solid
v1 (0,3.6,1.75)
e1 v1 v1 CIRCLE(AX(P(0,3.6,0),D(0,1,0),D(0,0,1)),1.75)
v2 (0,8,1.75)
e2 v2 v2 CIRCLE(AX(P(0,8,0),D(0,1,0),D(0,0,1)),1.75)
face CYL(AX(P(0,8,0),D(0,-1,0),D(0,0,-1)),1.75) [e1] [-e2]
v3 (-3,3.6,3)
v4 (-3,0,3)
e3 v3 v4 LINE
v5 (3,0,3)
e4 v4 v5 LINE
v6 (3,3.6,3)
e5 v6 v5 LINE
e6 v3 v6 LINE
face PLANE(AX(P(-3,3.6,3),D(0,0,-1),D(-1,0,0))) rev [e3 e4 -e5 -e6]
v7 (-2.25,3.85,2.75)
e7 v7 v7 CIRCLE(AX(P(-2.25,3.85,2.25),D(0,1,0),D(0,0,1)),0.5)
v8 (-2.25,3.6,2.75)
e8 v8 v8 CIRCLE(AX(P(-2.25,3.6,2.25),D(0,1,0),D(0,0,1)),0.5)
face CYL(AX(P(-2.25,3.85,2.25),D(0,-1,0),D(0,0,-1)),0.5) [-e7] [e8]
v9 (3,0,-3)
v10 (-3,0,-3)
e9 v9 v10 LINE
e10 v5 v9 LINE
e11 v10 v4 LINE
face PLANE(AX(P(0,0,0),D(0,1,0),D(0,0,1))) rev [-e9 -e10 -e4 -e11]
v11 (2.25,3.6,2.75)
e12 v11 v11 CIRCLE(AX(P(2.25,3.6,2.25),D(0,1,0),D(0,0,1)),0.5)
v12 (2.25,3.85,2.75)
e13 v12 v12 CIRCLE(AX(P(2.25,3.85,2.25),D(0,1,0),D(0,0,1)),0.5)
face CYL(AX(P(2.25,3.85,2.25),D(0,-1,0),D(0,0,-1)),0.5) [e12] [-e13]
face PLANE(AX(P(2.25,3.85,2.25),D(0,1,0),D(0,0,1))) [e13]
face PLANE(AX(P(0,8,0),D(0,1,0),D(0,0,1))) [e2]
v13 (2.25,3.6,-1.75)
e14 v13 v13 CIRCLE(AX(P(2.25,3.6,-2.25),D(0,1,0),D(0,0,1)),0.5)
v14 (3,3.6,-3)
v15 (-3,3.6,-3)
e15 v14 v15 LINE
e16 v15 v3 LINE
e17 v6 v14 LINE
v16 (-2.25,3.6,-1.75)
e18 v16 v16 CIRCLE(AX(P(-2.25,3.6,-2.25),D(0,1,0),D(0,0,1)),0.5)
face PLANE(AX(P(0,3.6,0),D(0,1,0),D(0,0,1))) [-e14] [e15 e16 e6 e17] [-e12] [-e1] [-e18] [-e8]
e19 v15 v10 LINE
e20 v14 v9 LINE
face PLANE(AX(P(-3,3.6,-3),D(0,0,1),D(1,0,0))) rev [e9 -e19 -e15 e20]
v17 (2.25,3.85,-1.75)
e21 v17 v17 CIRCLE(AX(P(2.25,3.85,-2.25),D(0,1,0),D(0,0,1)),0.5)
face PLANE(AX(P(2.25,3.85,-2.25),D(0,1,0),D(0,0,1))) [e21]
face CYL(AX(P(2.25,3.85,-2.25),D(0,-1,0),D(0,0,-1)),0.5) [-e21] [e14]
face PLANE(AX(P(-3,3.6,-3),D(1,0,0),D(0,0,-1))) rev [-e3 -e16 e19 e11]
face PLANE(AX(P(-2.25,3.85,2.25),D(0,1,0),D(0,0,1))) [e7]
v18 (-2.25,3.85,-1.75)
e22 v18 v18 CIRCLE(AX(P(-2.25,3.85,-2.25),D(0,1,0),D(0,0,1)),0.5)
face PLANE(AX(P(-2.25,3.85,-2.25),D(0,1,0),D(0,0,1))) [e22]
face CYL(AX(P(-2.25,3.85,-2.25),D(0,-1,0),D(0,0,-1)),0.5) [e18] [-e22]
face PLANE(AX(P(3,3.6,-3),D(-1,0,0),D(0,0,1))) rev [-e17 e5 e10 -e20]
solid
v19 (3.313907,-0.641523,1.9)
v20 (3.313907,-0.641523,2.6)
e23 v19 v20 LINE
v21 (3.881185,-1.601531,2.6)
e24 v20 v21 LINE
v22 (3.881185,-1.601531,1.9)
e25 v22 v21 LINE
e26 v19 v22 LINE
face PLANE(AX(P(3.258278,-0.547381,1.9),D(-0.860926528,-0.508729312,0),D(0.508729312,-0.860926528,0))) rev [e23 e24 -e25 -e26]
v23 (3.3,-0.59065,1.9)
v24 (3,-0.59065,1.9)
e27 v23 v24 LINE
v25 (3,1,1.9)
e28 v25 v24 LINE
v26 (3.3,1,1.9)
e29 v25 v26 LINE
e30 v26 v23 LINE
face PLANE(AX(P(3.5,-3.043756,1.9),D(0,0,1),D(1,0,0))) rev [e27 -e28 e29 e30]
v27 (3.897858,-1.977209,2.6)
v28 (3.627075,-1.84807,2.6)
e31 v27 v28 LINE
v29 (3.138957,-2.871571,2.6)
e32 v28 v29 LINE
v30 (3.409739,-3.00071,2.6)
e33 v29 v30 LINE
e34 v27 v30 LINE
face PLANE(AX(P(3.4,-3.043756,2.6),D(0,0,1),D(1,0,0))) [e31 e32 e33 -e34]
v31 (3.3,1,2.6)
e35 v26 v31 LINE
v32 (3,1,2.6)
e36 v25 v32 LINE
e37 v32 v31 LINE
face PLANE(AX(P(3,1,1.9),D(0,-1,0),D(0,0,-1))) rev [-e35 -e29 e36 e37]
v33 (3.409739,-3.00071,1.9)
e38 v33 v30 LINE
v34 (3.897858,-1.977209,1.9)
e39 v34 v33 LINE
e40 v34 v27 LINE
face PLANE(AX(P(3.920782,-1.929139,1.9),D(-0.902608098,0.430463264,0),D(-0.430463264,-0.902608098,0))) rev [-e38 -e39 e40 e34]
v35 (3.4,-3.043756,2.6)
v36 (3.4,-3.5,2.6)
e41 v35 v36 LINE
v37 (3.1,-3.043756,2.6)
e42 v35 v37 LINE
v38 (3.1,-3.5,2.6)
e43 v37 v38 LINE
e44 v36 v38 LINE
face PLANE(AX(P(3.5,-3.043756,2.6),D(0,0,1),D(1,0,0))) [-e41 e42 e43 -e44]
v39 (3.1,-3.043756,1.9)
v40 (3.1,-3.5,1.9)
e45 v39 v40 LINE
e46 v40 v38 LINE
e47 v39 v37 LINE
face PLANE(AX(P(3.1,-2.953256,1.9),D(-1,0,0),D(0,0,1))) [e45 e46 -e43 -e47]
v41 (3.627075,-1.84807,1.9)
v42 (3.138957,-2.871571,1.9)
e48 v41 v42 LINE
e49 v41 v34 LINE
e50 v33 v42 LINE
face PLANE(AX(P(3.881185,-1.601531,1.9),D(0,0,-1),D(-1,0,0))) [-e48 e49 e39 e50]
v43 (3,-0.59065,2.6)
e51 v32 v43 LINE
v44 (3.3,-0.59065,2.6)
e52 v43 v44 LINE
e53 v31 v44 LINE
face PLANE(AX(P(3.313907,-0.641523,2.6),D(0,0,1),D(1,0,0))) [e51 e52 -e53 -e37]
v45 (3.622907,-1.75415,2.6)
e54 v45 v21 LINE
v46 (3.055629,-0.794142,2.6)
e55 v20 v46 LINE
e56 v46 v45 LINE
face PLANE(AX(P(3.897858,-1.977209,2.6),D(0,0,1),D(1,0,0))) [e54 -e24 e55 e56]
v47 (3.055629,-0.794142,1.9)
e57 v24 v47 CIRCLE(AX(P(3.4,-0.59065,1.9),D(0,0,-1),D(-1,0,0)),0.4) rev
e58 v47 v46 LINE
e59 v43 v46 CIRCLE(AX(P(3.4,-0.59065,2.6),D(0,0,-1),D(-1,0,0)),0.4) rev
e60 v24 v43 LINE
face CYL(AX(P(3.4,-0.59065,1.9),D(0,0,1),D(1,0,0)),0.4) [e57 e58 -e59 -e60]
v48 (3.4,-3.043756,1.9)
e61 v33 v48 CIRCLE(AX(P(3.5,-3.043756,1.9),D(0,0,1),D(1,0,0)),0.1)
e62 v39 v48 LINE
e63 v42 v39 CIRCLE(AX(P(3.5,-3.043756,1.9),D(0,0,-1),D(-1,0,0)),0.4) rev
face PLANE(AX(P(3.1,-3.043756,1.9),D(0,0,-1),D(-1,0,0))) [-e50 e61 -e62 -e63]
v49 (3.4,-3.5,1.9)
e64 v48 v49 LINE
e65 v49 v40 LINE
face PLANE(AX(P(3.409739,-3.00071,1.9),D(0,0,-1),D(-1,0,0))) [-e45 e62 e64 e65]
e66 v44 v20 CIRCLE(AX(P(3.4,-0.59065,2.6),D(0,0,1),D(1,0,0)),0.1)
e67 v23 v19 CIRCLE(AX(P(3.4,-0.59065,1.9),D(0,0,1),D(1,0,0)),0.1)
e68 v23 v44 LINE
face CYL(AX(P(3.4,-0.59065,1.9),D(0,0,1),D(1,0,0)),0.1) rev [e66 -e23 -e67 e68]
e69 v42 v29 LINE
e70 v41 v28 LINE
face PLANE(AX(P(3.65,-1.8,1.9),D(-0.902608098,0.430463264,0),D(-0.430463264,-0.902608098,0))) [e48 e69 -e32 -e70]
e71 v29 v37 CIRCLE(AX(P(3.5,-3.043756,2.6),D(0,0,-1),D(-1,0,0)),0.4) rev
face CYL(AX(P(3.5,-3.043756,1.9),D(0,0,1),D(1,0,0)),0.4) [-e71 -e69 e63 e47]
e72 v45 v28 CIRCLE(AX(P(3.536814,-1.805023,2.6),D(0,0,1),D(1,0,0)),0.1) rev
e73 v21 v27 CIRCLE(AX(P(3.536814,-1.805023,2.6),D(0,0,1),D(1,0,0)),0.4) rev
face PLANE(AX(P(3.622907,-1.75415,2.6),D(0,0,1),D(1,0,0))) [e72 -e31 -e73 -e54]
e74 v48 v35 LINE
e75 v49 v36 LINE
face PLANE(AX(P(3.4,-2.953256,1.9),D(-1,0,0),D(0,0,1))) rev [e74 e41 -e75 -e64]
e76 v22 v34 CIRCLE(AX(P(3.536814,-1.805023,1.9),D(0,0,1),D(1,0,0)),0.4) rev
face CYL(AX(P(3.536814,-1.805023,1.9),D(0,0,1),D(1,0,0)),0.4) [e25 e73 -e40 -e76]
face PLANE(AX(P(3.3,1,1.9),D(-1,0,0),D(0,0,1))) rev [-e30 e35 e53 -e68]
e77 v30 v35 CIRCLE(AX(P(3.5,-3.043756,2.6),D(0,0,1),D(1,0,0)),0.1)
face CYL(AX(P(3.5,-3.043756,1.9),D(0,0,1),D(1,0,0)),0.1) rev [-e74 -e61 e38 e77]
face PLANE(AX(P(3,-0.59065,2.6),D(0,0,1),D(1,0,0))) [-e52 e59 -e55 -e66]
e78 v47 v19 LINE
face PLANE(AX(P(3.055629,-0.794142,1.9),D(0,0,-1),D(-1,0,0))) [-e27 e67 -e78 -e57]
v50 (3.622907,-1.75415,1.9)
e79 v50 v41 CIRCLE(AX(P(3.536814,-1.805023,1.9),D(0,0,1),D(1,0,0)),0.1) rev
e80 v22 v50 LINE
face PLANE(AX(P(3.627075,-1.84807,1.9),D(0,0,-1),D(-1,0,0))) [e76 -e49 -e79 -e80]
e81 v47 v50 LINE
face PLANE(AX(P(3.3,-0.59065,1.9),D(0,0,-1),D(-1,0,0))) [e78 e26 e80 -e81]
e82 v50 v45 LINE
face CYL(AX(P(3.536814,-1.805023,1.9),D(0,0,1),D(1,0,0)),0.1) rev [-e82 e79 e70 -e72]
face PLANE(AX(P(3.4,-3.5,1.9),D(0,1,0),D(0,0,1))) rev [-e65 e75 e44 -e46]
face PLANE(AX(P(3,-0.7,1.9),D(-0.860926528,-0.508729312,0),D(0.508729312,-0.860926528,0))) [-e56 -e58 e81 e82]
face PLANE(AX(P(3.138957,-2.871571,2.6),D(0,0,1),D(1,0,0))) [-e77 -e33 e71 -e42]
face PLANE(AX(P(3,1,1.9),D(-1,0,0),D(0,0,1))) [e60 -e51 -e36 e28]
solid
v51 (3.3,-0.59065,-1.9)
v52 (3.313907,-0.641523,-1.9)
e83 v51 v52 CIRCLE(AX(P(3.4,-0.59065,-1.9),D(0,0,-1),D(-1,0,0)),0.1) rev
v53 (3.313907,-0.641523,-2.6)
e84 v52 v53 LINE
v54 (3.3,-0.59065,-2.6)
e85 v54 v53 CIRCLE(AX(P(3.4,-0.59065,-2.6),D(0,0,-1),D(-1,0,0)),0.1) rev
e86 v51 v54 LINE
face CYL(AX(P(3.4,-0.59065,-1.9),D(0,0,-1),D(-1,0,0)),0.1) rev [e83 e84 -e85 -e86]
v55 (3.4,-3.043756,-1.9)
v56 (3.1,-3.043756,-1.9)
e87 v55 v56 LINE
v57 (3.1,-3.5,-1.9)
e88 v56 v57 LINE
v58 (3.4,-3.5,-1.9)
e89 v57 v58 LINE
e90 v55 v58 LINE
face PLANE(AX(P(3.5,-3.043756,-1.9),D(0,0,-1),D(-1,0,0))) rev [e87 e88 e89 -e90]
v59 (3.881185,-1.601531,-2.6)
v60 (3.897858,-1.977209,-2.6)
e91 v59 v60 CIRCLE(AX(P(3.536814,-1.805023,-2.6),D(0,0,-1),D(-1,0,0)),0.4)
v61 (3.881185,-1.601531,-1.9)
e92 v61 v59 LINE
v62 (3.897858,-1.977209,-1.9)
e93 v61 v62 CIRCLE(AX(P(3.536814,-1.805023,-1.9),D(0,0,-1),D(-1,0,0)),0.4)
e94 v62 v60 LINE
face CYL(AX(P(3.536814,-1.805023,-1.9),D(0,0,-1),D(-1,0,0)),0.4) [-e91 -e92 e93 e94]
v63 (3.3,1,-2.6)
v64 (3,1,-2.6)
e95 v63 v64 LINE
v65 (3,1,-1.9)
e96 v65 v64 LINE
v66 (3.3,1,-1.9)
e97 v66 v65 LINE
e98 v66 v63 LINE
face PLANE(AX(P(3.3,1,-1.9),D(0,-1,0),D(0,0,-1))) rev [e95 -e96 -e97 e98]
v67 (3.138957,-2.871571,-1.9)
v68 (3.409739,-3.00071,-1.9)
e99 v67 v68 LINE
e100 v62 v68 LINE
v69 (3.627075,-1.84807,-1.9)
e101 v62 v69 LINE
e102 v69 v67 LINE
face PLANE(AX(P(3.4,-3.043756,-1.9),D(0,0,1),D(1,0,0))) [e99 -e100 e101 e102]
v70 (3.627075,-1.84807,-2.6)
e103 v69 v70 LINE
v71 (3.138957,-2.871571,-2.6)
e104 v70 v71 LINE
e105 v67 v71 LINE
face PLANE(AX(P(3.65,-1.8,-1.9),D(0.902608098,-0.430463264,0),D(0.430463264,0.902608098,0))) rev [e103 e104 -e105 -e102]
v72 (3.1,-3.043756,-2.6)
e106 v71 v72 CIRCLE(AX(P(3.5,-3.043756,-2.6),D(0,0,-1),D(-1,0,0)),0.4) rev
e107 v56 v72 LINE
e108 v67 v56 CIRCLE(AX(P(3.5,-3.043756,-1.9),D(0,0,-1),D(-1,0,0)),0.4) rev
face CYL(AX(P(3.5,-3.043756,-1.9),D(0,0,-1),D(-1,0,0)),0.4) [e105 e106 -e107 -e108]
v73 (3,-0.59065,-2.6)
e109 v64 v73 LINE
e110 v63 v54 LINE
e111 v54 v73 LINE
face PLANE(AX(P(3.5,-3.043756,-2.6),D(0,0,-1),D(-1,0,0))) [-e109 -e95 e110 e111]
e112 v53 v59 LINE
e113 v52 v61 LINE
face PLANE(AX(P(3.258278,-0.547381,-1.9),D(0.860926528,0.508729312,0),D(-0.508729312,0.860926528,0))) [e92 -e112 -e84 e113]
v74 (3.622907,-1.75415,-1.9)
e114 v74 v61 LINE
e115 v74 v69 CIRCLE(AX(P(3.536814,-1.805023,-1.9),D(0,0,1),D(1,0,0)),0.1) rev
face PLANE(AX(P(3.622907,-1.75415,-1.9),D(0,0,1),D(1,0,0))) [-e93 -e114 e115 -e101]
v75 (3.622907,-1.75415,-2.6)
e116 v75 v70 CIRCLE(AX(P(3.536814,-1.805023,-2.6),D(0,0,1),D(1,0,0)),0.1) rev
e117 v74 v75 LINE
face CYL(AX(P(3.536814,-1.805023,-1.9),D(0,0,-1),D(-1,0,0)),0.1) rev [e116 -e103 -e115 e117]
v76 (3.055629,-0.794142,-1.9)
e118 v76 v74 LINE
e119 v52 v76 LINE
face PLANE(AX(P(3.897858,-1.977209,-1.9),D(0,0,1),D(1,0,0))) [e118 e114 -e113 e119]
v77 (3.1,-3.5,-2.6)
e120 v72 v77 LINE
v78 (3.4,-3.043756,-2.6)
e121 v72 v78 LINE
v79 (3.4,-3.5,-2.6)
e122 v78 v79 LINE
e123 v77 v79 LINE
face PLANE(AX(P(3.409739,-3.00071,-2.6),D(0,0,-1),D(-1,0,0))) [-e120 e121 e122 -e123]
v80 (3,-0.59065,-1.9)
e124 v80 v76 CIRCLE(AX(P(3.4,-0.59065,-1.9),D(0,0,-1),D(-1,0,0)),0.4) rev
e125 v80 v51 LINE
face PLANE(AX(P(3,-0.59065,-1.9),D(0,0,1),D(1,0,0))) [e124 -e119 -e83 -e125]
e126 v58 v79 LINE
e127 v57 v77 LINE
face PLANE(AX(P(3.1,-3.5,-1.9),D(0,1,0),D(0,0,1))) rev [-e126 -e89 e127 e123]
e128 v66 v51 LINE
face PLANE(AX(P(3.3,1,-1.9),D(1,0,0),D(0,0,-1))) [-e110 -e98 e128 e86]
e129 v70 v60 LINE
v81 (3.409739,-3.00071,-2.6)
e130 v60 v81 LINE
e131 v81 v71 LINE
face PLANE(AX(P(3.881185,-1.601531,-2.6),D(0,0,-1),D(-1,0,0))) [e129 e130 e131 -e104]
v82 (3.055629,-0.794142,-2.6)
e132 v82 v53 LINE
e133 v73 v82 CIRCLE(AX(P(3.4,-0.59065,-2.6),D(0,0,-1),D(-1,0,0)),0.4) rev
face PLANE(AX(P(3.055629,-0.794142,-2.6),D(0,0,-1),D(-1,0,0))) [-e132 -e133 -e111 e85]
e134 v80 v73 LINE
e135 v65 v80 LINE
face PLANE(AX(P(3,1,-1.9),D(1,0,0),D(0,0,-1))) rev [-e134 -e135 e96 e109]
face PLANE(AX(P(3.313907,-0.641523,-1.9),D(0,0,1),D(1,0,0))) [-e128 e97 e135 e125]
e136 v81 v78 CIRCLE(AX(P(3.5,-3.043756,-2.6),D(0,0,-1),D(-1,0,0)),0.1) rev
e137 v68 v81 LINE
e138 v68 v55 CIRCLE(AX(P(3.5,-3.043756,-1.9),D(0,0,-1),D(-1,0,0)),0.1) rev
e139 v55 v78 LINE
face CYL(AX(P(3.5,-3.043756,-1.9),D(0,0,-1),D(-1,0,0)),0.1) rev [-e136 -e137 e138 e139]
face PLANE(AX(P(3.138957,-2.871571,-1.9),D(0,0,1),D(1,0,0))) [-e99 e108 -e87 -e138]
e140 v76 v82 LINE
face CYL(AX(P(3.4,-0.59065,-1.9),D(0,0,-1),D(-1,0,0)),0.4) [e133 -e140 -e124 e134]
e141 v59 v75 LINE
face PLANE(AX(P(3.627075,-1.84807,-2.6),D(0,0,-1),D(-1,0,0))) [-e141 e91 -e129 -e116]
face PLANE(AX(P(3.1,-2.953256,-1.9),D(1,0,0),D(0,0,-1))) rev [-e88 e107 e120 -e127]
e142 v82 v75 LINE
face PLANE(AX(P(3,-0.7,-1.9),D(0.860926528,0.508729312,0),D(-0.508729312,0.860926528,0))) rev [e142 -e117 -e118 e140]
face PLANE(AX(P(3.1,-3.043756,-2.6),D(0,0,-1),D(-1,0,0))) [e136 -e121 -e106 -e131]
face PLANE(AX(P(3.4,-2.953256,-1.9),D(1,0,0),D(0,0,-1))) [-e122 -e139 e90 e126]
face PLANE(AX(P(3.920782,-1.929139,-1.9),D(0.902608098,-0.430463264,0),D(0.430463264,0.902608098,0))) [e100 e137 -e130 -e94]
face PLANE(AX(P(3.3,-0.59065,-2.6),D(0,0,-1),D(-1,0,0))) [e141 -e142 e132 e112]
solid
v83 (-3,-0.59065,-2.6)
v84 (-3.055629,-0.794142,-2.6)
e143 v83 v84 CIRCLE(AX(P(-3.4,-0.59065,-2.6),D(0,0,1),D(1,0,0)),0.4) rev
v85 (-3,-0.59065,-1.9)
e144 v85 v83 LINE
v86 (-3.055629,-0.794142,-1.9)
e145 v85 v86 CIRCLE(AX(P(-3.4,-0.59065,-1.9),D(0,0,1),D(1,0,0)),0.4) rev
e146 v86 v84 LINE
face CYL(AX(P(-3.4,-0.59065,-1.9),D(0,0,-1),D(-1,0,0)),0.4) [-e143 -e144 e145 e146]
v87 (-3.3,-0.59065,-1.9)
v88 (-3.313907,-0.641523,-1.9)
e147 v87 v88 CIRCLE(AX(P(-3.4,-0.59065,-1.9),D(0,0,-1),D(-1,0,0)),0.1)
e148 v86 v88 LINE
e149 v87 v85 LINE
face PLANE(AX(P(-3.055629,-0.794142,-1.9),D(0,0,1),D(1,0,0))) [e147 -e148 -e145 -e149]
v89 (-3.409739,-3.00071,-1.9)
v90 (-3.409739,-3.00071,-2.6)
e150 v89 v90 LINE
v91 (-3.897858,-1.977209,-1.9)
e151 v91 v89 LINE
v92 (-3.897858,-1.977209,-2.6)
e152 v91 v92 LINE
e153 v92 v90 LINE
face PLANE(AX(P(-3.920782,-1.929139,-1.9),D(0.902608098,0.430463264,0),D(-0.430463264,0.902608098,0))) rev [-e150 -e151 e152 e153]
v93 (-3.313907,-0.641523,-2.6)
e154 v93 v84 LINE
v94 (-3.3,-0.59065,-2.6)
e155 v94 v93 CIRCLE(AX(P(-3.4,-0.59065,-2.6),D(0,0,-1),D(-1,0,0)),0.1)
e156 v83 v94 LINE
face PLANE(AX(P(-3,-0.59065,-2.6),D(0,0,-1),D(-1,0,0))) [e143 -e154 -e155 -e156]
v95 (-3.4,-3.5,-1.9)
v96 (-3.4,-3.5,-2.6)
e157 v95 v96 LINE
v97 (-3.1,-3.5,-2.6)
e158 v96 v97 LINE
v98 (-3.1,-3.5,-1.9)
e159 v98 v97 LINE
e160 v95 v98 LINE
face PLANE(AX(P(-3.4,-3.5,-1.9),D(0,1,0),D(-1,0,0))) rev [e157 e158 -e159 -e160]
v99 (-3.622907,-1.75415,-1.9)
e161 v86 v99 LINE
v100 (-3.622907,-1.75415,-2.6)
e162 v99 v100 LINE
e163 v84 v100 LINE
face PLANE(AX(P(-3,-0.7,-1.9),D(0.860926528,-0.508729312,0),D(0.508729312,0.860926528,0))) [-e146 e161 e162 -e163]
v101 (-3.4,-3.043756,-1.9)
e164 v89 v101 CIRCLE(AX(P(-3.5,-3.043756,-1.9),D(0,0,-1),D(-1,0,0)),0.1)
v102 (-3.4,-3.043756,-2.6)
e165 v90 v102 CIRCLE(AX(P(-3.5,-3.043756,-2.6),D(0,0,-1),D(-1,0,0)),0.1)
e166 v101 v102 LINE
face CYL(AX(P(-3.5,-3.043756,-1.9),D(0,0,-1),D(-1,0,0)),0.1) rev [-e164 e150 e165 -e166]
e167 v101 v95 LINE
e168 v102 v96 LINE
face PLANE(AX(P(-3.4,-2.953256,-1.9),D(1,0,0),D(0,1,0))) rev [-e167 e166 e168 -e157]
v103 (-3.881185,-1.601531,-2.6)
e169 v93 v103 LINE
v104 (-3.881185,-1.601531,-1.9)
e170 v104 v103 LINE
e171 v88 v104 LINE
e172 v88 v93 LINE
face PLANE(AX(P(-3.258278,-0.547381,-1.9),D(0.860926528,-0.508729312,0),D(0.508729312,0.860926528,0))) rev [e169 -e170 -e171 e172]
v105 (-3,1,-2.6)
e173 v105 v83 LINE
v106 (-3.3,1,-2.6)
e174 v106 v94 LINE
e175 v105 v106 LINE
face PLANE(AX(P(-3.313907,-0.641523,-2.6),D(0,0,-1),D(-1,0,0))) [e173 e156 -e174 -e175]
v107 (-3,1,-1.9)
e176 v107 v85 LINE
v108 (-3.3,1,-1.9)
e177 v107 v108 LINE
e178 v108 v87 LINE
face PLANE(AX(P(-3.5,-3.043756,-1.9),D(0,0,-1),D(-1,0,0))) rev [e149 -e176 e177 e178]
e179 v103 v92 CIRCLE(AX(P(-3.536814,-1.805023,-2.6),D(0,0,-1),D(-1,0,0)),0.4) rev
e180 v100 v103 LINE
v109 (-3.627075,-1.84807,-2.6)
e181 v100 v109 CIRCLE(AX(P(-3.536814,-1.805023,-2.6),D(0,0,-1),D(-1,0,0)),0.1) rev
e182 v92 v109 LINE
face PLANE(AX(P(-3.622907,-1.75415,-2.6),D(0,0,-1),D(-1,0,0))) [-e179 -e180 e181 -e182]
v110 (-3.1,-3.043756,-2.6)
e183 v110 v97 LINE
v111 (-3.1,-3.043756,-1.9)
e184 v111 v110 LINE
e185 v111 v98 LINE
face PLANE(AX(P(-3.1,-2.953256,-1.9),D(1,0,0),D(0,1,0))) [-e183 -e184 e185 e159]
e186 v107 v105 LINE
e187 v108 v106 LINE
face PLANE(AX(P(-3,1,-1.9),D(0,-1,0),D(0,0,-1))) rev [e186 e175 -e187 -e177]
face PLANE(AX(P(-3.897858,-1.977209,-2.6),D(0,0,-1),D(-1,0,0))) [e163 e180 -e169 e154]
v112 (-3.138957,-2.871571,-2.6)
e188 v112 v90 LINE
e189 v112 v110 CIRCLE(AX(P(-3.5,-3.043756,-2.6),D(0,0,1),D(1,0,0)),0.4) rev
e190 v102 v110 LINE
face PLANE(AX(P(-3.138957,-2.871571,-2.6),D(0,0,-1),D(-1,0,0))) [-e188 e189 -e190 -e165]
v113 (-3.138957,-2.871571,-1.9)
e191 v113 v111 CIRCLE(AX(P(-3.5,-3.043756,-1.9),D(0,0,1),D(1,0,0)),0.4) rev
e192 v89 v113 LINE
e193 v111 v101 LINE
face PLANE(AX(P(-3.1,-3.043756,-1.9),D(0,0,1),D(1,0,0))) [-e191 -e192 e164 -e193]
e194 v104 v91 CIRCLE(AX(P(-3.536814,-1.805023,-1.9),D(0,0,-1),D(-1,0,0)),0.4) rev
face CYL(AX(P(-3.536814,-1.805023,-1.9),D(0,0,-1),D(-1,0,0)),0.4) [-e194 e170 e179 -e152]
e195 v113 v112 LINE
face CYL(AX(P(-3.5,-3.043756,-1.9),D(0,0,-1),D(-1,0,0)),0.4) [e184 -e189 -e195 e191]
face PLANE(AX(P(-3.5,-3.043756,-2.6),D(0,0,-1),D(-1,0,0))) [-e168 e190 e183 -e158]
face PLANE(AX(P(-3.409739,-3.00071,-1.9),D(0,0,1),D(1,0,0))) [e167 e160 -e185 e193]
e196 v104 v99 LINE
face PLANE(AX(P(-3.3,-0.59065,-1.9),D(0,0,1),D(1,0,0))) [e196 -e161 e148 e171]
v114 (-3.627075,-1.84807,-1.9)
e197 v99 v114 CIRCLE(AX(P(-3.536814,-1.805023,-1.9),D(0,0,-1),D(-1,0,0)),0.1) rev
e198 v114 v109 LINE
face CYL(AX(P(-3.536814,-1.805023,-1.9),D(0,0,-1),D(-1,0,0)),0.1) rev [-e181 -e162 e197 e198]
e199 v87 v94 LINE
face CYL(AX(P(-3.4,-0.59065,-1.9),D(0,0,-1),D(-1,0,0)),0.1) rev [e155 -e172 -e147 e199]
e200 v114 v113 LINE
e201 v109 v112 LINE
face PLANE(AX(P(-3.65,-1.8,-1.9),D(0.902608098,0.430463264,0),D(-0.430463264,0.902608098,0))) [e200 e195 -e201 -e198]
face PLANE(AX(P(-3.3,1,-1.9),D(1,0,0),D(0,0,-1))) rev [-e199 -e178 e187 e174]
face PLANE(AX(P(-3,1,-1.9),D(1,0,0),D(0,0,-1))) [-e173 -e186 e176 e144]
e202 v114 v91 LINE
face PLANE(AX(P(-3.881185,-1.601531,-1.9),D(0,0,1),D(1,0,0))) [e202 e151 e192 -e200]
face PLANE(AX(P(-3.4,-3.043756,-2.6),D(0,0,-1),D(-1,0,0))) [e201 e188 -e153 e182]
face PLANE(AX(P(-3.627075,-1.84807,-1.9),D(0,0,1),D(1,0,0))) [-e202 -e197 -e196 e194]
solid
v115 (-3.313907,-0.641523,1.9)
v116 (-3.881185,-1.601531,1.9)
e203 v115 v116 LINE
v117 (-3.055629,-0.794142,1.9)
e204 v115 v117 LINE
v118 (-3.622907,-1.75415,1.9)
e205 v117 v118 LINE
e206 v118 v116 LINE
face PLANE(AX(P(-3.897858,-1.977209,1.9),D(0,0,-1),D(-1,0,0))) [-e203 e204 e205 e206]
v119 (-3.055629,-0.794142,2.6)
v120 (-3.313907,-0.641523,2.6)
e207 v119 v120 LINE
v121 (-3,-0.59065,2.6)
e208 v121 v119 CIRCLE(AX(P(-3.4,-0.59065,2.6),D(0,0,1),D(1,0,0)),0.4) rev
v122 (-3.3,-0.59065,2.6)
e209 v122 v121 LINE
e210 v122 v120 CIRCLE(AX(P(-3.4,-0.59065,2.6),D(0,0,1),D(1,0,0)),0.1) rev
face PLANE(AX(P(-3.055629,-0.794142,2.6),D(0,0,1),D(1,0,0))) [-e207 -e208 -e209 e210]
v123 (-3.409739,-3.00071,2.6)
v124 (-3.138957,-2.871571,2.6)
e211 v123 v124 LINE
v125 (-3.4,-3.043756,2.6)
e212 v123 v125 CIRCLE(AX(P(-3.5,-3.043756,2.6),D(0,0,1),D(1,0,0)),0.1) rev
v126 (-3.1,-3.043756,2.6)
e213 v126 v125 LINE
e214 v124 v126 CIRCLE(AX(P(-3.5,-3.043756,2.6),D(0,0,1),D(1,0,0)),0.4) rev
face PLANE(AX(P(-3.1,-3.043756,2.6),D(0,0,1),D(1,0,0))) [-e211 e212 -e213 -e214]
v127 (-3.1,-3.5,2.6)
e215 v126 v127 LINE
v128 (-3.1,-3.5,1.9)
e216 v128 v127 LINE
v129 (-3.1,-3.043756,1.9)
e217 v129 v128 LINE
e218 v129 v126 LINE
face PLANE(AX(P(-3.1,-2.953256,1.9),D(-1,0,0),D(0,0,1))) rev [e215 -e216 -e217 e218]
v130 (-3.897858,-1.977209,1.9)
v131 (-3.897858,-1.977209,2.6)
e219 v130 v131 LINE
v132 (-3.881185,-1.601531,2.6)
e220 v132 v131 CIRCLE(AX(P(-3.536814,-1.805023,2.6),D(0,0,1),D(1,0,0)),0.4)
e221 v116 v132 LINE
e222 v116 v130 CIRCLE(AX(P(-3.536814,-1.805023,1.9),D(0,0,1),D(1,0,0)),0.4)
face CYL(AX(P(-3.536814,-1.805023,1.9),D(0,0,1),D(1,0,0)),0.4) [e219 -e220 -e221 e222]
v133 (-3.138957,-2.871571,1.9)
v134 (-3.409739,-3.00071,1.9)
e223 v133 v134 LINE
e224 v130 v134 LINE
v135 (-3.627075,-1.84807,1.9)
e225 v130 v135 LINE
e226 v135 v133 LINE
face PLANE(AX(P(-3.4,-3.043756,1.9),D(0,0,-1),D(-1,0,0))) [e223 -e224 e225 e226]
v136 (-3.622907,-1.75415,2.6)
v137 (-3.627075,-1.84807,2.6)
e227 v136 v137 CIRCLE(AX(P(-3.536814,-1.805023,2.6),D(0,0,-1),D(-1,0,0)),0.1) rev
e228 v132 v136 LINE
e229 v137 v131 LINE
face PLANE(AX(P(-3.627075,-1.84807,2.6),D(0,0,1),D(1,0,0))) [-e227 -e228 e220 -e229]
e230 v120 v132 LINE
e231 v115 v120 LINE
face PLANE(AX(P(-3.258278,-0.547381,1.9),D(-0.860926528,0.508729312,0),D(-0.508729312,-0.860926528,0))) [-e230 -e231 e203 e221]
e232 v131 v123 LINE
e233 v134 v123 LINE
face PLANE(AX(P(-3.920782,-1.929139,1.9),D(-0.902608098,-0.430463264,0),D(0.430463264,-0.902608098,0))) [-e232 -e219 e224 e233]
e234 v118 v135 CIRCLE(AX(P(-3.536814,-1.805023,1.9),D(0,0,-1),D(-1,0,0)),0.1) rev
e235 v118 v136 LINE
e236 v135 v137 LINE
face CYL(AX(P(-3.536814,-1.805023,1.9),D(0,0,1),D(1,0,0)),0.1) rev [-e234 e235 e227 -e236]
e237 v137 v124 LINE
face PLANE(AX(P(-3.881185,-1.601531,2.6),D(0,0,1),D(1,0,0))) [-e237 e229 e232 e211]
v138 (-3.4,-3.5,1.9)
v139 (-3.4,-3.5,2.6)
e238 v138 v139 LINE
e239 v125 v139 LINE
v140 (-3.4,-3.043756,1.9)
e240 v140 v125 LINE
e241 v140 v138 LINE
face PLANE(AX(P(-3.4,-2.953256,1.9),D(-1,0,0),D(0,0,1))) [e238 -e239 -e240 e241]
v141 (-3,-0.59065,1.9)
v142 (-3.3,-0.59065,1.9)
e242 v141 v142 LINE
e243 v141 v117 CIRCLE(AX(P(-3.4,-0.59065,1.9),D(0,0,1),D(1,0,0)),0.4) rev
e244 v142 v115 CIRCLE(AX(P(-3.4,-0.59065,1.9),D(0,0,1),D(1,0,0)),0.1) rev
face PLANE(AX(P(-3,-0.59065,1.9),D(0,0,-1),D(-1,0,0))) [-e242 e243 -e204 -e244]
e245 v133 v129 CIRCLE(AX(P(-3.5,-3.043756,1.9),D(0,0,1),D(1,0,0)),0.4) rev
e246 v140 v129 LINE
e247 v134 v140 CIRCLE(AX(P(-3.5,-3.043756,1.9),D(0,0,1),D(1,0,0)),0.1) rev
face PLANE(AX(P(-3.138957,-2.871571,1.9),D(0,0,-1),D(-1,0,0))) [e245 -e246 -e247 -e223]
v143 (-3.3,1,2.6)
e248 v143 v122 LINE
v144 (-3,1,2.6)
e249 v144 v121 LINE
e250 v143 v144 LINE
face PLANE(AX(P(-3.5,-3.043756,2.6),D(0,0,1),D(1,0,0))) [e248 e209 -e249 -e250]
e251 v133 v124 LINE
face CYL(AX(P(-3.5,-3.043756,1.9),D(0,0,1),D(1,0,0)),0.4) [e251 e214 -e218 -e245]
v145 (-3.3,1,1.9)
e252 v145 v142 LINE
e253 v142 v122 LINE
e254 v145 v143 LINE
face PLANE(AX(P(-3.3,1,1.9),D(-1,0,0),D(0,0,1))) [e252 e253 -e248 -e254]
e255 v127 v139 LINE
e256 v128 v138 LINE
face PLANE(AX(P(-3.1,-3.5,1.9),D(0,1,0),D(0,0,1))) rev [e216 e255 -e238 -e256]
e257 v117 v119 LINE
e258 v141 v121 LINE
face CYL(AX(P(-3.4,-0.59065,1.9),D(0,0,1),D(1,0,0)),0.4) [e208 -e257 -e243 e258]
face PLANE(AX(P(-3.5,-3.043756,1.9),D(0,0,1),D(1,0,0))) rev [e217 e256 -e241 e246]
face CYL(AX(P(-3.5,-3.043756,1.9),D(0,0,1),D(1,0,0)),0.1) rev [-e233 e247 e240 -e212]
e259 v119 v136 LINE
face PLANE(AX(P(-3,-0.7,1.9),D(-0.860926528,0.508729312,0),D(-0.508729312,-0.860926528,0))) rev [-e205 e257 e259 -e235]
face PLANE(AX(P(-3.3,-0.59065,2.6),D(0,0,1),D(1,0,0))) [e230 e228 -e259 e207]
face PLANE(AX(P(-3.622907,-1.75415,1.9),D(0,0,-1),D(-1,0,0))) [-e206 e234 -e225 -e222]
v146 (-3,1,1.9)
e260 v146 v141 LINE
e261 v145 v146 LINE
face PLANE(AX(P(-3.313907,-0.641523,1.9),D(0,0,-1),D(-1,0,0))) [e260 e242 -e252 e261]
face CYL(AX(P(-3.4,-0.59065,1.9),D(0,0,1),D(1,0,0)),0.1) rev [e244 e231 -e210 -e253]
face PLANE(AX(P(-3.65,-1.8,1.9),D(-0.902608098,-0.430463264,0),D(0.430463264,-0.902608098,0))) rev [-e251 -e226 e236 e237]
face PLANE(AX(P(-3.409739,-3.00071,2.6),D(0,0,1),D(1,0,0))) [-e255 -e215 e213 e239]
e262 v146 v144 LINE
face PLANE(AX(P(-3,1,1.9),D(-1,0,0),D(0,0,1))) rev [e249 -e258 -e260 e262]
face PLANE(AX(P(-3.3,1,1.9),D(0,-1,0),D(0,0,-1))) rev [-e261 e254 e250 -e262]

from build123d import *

# Parameters (mm, degrees)
SKETCH1_W            = 6
SKETCH1_H            = 6
BOSS_EXTRUDE1_DEPTH  = 3.6
SKETCH3_R            = 1.75
BOSS_EXTRUDE2_DEPTH  = 4.4
SKETCH4_R            = 0.5
BOSS_EXTRUDE3_DEPTH  = 0.25
LPATTERN1_COUNT      = 2
LPATTERN1_PITCH      = 4.5
LPATTERN1_COUNT_DIR2 = 2
LPATTERN1_PITCH_DIR2 = 4.5
BASE_FLANGE1_DEPTH   = 0.7
BASE_FLANGE2_DEPTH   = 0.7
BASE_FLANGE3_DEPTH   = 0.7
BASE_FLANGE4_DEPTH   = 0.7


# Sheet-metal steps are written as plain solids
with BuildPart() as part:
    # Sketch1 → Boss-Extrude1 (new body)
    with BuildSketch(Plane(origin=(0, 0, 0), x_dir=(1, 0, 0), z_dir=(0, 1, 0))):
        Rectangle(SKETCH1_W, SKETCH1_H)
    extrude(amount=BOSS_EXTRUDE1_DEPTH)

    # Sketch3 → Boss-Extrude2 (add)
    with BuildSketch(Plane(origin=(0, 3.6, 0), x_dir=(1, 0, 0), z_dir=(0, 1, 0))):
        with Locations(Location((0, 0, 0), (0, 0, 270))):
            Circle(SKETCH3_R)
    extrude(amount=BOSS_EXTRUDE2_DEPTH)

    # Sketch4 → Boss-Extrude3 (add)
    with BuildSketch(Plane(origin=(0, 3.6, 0), x_dir=(1, 0, 0), z_dir=(0, 1, 0))):
        with Locations(Location((-2.25, -2.25, 0), (0, 0, 270))):
            Circle(SKETCH4_R)
    boss_extrude3 = extrude(amount=BOSS_EXTRUDE3_DEPTH)

    # LPattern1: Boss-Extrude3 2 × 2
    with Locations(*[(i * LPATTERN1_PITCH, 0, -j * LPATTERN1_PITCH_DIR2) for i in range(LPATTERN1_COUNT) for j in range(LPATTERN1_COUNT_DIR2) if (i, j) != (0, 0)]):
        add(boss_extrude3)


with BuildPart() as body_2:
    # Sketch6 → Base-Flange1 (new body)
    with BuildSketch(Plane.XY.offset(2.6)):
        with BuildLine():
            Line((3, 1), (3, -0.590650318))
            ThreePointArc((3, -0.590650318), (3.014157905, -0.696129594), (3.055629389, -0.794142042))
            Line((3.055629389, -0.794142042), (3.62290698, -1.754150273))
            ThreePointArc((3.62290698, -1.754150273), (3.636715992, -1.800589547), (3.627075137, -1.848069531))
            Line((3.627075137, -1.848069531), (3.138956761, -2.871570572))
            ThreePointArc((3.138956761, -2.871570572), (3.109860733, -2.955487241), (3.1, -3.043755877))
            Line((3.1, -3.043755877), (3.1, -3.5))
            Line((3.1, -3.5), (3.4, -3.5))
            Line((3.4, -3.5), (3.4, -3.043755877))
            ThreePointArc((3.4, -3.043755877), (3.402465183, -3.021688718), (3.40973919, -3.000709551))
            Line((3.40973919, -3.000709551), (3.897857566, -1.97720851))
            ThreePointArc((3.897857566, -1.97720851), (3.936420987, -1.787288575), (3.881184938, -1.60153148))
            Line((3.881184938, -1.60153148), (3.313907347, -0.641523249))
            ThreePointArc((3.313907347, -0.641523249), (3.303539476, -0.617020137), (3.3, -0.590650318))
            Line((3.3, -0.590650318), (3.3, 1))
            Line((3.3, 1), (3, 1))
        make_face()
    extrude(amount=-BASE_FLANGE1_DEPTH)


with BuildPart() as body_3:
    # Sketch9 → Base-Flange2 (new body)
    with BuildSketch(Plane.XY.offset(2.6)):
        with BuildLine():
            Line((-3, 1), (-3, -0.590650318))
            ThreePointArc((-3, -0.590650318), (-3.014157905, -0.696129594), (-3.055629389, -0.794142042))
            Line((-3.055629389, -0.794142042), (-3.62290698, -1.754150273))
            ThreePointArc((-3.62290698, -1.754150273), (-3.636715992, -1.800589547), (-3.627075137, -1.848069531))
            Line((-3.627075137, -1.848069531), (-3.138956761, -2.871570572))
            ThreePointArc((-3.138956761, -2.871570572), (-3.109860733, -2.955487241), (-3.1, -3.043755877))
            Line((-3.1, -3.043755877), (-3.1, -3.5))
            Line((-3.1, -3.5), (-3.4, -3.5))
            Line((-3.4, -3.5), (-3.4, -3.043755877))
            ThreePointArc((-3.4, -3.043755877), (-3.402465183, -3.021688718), (-3.40973919, -3.000709551))
            Line((-3.40973919, -3.000709551), (-3.897857566, -1.97720851))
            ThreePointArc((-3.897857566, -1.97720851), (-3.936420987, -1.787288575), (-3.881184938, -1.60153148))
            Line((-3.881184938, -1.60153148), (-3.313907347, -0.641523249))
            ThreePointArc((-3.313907347, -0.641523249), (-3.303539476, -0.617020137), (-3.3, -0.590650318))
            Line((-3.3, -0.590650318), (-3.3, 1))
            Line((-3.3, 1), (-3, 1))
        make_face()
    extrude(amount=-BASE_FLANGE2_DEPTH)


with BuildPart() as body_4:
    # Sketch12 → Base-Flange3 (new body)
    with BuildSketch(Plane(origin=(0, 0, -2.6), x_dir=(-1, 0, 0), z_dir=(0, 0, -1))):
        with BuildLine():
            Line((-3, 1), (-3, -0.590650318))
            ThreePointArc((-3, -0.590650318), (-3.014157905, -0.696129594), (-3.055629389, -0.794142042))
            Line((-3.055629389, -0.794142042), (-3.62290698, -1.754150273))
            ThreePointArc((-3.62290698, -1.754150273), (-3.636715992, -1.800589547), (-3.627075137, -1.848069531))
            Line((-3.627075137, -1.848069531), (-3.138956761, -2.871570572))
            ThreePointArc((-3.138956761, -2.871570572), (-3.109860733, -2.955487241), (-3.1, -3.043755877))
            Line((-3.1, -3.043755877), (-3.1, -3.5))
            Line((-3.1, -3.5), (-3.4, -3.5))
            Line((-3.4, -3.5), (-3.4, -3.043755877))
            ThreePointArc((-3.4, -3.043755877), (-3.402465183, -3.021688718), (-3.40973919, -3.000709551))
            Line((-3.40973919, -3.000709551), (-3.897857566, -1.97720851))
            ThreePointArc((-3.897857566, -1.97720851), (-3.936420987, -1.787288575), (-3.881184938, -1.60153148))
            Line((-3.881184938, -1.60153148), (-3.313907347, -0.641523249))
            ThreePointArc((-3.313907347, -0.641523249), (-3.303539476, -0.617020137), (-3.3, -0.590650318))
            Line((-3.3, -0.590650318), (-3.3, 1))
            Line((-3.3, 1), (-3, 1))
        make_face()
    extrude(amount=-BASE_FLANGE3_DEPTH)


with BuildPart() as body_5:
    # Sketch15 → Base-Flange4 (new body)
    with BuildSketch(Plane(origin=(0, 0, -2.6), x_dir=(-1, 0, 0), z_dir=(0, 0, -1))):
        with BuildLine():
            Line((3, 1), (3, -0.590650318))
            ThreePointArc((3, -0.590650318), (3.014157905, -0.696129594), (3.055629389, -0.794142042))
            Line((3.055629389, -0.794142042), (3.62290698, -1.754150273))
            ThreePointArc((3.62290698, -1.754150273), (3.636715992, -1.800589547), (3.627075137, -1.848069531))
            Line((3.627075137, -1.848069531), (3.138956761, -2.871570572))
            ThreePointArc((3.138956761, -2.871570572), (3.109860733, -2.955487241), (3.1, -3.043755877))
            Line((3.1, -3.043755877), (3.1, -3.5))
            Line((3.1, -3.5), (3.4, -3.5))
            Line((3.4, -3.5), (3.4, -3.043755877))
            ThreePointArc((3.4, -3.043755877), (3.402465183, -3.021688718), (3.40973919, -3.000709551))
            Line((3.40973919, -3.000709551), (3.897857566, -1.97720851))
            ThreePointArc((3.897857566, -1.97720851), (3.936420987, -1.787288575), (3.881184938, -1.60153148))
            Line((3.881184938, -1.60153148), (3.313907347, -0.641523249))
            ThreePointArc((3.313907347, -0.641523249), (3.303539476, -0.617020137), (3.3, -0.590650318))
            Line((3.3, -0.590650318), (3.3, 1))
            Line((3.3, 1), (3, 1))
        make_face()
    extrude(amount=-BASE_FLANGE4_DEPTH)


solid = Compound([part.part, body_2.part, body_3.part, body_4.part, body_5.part])
